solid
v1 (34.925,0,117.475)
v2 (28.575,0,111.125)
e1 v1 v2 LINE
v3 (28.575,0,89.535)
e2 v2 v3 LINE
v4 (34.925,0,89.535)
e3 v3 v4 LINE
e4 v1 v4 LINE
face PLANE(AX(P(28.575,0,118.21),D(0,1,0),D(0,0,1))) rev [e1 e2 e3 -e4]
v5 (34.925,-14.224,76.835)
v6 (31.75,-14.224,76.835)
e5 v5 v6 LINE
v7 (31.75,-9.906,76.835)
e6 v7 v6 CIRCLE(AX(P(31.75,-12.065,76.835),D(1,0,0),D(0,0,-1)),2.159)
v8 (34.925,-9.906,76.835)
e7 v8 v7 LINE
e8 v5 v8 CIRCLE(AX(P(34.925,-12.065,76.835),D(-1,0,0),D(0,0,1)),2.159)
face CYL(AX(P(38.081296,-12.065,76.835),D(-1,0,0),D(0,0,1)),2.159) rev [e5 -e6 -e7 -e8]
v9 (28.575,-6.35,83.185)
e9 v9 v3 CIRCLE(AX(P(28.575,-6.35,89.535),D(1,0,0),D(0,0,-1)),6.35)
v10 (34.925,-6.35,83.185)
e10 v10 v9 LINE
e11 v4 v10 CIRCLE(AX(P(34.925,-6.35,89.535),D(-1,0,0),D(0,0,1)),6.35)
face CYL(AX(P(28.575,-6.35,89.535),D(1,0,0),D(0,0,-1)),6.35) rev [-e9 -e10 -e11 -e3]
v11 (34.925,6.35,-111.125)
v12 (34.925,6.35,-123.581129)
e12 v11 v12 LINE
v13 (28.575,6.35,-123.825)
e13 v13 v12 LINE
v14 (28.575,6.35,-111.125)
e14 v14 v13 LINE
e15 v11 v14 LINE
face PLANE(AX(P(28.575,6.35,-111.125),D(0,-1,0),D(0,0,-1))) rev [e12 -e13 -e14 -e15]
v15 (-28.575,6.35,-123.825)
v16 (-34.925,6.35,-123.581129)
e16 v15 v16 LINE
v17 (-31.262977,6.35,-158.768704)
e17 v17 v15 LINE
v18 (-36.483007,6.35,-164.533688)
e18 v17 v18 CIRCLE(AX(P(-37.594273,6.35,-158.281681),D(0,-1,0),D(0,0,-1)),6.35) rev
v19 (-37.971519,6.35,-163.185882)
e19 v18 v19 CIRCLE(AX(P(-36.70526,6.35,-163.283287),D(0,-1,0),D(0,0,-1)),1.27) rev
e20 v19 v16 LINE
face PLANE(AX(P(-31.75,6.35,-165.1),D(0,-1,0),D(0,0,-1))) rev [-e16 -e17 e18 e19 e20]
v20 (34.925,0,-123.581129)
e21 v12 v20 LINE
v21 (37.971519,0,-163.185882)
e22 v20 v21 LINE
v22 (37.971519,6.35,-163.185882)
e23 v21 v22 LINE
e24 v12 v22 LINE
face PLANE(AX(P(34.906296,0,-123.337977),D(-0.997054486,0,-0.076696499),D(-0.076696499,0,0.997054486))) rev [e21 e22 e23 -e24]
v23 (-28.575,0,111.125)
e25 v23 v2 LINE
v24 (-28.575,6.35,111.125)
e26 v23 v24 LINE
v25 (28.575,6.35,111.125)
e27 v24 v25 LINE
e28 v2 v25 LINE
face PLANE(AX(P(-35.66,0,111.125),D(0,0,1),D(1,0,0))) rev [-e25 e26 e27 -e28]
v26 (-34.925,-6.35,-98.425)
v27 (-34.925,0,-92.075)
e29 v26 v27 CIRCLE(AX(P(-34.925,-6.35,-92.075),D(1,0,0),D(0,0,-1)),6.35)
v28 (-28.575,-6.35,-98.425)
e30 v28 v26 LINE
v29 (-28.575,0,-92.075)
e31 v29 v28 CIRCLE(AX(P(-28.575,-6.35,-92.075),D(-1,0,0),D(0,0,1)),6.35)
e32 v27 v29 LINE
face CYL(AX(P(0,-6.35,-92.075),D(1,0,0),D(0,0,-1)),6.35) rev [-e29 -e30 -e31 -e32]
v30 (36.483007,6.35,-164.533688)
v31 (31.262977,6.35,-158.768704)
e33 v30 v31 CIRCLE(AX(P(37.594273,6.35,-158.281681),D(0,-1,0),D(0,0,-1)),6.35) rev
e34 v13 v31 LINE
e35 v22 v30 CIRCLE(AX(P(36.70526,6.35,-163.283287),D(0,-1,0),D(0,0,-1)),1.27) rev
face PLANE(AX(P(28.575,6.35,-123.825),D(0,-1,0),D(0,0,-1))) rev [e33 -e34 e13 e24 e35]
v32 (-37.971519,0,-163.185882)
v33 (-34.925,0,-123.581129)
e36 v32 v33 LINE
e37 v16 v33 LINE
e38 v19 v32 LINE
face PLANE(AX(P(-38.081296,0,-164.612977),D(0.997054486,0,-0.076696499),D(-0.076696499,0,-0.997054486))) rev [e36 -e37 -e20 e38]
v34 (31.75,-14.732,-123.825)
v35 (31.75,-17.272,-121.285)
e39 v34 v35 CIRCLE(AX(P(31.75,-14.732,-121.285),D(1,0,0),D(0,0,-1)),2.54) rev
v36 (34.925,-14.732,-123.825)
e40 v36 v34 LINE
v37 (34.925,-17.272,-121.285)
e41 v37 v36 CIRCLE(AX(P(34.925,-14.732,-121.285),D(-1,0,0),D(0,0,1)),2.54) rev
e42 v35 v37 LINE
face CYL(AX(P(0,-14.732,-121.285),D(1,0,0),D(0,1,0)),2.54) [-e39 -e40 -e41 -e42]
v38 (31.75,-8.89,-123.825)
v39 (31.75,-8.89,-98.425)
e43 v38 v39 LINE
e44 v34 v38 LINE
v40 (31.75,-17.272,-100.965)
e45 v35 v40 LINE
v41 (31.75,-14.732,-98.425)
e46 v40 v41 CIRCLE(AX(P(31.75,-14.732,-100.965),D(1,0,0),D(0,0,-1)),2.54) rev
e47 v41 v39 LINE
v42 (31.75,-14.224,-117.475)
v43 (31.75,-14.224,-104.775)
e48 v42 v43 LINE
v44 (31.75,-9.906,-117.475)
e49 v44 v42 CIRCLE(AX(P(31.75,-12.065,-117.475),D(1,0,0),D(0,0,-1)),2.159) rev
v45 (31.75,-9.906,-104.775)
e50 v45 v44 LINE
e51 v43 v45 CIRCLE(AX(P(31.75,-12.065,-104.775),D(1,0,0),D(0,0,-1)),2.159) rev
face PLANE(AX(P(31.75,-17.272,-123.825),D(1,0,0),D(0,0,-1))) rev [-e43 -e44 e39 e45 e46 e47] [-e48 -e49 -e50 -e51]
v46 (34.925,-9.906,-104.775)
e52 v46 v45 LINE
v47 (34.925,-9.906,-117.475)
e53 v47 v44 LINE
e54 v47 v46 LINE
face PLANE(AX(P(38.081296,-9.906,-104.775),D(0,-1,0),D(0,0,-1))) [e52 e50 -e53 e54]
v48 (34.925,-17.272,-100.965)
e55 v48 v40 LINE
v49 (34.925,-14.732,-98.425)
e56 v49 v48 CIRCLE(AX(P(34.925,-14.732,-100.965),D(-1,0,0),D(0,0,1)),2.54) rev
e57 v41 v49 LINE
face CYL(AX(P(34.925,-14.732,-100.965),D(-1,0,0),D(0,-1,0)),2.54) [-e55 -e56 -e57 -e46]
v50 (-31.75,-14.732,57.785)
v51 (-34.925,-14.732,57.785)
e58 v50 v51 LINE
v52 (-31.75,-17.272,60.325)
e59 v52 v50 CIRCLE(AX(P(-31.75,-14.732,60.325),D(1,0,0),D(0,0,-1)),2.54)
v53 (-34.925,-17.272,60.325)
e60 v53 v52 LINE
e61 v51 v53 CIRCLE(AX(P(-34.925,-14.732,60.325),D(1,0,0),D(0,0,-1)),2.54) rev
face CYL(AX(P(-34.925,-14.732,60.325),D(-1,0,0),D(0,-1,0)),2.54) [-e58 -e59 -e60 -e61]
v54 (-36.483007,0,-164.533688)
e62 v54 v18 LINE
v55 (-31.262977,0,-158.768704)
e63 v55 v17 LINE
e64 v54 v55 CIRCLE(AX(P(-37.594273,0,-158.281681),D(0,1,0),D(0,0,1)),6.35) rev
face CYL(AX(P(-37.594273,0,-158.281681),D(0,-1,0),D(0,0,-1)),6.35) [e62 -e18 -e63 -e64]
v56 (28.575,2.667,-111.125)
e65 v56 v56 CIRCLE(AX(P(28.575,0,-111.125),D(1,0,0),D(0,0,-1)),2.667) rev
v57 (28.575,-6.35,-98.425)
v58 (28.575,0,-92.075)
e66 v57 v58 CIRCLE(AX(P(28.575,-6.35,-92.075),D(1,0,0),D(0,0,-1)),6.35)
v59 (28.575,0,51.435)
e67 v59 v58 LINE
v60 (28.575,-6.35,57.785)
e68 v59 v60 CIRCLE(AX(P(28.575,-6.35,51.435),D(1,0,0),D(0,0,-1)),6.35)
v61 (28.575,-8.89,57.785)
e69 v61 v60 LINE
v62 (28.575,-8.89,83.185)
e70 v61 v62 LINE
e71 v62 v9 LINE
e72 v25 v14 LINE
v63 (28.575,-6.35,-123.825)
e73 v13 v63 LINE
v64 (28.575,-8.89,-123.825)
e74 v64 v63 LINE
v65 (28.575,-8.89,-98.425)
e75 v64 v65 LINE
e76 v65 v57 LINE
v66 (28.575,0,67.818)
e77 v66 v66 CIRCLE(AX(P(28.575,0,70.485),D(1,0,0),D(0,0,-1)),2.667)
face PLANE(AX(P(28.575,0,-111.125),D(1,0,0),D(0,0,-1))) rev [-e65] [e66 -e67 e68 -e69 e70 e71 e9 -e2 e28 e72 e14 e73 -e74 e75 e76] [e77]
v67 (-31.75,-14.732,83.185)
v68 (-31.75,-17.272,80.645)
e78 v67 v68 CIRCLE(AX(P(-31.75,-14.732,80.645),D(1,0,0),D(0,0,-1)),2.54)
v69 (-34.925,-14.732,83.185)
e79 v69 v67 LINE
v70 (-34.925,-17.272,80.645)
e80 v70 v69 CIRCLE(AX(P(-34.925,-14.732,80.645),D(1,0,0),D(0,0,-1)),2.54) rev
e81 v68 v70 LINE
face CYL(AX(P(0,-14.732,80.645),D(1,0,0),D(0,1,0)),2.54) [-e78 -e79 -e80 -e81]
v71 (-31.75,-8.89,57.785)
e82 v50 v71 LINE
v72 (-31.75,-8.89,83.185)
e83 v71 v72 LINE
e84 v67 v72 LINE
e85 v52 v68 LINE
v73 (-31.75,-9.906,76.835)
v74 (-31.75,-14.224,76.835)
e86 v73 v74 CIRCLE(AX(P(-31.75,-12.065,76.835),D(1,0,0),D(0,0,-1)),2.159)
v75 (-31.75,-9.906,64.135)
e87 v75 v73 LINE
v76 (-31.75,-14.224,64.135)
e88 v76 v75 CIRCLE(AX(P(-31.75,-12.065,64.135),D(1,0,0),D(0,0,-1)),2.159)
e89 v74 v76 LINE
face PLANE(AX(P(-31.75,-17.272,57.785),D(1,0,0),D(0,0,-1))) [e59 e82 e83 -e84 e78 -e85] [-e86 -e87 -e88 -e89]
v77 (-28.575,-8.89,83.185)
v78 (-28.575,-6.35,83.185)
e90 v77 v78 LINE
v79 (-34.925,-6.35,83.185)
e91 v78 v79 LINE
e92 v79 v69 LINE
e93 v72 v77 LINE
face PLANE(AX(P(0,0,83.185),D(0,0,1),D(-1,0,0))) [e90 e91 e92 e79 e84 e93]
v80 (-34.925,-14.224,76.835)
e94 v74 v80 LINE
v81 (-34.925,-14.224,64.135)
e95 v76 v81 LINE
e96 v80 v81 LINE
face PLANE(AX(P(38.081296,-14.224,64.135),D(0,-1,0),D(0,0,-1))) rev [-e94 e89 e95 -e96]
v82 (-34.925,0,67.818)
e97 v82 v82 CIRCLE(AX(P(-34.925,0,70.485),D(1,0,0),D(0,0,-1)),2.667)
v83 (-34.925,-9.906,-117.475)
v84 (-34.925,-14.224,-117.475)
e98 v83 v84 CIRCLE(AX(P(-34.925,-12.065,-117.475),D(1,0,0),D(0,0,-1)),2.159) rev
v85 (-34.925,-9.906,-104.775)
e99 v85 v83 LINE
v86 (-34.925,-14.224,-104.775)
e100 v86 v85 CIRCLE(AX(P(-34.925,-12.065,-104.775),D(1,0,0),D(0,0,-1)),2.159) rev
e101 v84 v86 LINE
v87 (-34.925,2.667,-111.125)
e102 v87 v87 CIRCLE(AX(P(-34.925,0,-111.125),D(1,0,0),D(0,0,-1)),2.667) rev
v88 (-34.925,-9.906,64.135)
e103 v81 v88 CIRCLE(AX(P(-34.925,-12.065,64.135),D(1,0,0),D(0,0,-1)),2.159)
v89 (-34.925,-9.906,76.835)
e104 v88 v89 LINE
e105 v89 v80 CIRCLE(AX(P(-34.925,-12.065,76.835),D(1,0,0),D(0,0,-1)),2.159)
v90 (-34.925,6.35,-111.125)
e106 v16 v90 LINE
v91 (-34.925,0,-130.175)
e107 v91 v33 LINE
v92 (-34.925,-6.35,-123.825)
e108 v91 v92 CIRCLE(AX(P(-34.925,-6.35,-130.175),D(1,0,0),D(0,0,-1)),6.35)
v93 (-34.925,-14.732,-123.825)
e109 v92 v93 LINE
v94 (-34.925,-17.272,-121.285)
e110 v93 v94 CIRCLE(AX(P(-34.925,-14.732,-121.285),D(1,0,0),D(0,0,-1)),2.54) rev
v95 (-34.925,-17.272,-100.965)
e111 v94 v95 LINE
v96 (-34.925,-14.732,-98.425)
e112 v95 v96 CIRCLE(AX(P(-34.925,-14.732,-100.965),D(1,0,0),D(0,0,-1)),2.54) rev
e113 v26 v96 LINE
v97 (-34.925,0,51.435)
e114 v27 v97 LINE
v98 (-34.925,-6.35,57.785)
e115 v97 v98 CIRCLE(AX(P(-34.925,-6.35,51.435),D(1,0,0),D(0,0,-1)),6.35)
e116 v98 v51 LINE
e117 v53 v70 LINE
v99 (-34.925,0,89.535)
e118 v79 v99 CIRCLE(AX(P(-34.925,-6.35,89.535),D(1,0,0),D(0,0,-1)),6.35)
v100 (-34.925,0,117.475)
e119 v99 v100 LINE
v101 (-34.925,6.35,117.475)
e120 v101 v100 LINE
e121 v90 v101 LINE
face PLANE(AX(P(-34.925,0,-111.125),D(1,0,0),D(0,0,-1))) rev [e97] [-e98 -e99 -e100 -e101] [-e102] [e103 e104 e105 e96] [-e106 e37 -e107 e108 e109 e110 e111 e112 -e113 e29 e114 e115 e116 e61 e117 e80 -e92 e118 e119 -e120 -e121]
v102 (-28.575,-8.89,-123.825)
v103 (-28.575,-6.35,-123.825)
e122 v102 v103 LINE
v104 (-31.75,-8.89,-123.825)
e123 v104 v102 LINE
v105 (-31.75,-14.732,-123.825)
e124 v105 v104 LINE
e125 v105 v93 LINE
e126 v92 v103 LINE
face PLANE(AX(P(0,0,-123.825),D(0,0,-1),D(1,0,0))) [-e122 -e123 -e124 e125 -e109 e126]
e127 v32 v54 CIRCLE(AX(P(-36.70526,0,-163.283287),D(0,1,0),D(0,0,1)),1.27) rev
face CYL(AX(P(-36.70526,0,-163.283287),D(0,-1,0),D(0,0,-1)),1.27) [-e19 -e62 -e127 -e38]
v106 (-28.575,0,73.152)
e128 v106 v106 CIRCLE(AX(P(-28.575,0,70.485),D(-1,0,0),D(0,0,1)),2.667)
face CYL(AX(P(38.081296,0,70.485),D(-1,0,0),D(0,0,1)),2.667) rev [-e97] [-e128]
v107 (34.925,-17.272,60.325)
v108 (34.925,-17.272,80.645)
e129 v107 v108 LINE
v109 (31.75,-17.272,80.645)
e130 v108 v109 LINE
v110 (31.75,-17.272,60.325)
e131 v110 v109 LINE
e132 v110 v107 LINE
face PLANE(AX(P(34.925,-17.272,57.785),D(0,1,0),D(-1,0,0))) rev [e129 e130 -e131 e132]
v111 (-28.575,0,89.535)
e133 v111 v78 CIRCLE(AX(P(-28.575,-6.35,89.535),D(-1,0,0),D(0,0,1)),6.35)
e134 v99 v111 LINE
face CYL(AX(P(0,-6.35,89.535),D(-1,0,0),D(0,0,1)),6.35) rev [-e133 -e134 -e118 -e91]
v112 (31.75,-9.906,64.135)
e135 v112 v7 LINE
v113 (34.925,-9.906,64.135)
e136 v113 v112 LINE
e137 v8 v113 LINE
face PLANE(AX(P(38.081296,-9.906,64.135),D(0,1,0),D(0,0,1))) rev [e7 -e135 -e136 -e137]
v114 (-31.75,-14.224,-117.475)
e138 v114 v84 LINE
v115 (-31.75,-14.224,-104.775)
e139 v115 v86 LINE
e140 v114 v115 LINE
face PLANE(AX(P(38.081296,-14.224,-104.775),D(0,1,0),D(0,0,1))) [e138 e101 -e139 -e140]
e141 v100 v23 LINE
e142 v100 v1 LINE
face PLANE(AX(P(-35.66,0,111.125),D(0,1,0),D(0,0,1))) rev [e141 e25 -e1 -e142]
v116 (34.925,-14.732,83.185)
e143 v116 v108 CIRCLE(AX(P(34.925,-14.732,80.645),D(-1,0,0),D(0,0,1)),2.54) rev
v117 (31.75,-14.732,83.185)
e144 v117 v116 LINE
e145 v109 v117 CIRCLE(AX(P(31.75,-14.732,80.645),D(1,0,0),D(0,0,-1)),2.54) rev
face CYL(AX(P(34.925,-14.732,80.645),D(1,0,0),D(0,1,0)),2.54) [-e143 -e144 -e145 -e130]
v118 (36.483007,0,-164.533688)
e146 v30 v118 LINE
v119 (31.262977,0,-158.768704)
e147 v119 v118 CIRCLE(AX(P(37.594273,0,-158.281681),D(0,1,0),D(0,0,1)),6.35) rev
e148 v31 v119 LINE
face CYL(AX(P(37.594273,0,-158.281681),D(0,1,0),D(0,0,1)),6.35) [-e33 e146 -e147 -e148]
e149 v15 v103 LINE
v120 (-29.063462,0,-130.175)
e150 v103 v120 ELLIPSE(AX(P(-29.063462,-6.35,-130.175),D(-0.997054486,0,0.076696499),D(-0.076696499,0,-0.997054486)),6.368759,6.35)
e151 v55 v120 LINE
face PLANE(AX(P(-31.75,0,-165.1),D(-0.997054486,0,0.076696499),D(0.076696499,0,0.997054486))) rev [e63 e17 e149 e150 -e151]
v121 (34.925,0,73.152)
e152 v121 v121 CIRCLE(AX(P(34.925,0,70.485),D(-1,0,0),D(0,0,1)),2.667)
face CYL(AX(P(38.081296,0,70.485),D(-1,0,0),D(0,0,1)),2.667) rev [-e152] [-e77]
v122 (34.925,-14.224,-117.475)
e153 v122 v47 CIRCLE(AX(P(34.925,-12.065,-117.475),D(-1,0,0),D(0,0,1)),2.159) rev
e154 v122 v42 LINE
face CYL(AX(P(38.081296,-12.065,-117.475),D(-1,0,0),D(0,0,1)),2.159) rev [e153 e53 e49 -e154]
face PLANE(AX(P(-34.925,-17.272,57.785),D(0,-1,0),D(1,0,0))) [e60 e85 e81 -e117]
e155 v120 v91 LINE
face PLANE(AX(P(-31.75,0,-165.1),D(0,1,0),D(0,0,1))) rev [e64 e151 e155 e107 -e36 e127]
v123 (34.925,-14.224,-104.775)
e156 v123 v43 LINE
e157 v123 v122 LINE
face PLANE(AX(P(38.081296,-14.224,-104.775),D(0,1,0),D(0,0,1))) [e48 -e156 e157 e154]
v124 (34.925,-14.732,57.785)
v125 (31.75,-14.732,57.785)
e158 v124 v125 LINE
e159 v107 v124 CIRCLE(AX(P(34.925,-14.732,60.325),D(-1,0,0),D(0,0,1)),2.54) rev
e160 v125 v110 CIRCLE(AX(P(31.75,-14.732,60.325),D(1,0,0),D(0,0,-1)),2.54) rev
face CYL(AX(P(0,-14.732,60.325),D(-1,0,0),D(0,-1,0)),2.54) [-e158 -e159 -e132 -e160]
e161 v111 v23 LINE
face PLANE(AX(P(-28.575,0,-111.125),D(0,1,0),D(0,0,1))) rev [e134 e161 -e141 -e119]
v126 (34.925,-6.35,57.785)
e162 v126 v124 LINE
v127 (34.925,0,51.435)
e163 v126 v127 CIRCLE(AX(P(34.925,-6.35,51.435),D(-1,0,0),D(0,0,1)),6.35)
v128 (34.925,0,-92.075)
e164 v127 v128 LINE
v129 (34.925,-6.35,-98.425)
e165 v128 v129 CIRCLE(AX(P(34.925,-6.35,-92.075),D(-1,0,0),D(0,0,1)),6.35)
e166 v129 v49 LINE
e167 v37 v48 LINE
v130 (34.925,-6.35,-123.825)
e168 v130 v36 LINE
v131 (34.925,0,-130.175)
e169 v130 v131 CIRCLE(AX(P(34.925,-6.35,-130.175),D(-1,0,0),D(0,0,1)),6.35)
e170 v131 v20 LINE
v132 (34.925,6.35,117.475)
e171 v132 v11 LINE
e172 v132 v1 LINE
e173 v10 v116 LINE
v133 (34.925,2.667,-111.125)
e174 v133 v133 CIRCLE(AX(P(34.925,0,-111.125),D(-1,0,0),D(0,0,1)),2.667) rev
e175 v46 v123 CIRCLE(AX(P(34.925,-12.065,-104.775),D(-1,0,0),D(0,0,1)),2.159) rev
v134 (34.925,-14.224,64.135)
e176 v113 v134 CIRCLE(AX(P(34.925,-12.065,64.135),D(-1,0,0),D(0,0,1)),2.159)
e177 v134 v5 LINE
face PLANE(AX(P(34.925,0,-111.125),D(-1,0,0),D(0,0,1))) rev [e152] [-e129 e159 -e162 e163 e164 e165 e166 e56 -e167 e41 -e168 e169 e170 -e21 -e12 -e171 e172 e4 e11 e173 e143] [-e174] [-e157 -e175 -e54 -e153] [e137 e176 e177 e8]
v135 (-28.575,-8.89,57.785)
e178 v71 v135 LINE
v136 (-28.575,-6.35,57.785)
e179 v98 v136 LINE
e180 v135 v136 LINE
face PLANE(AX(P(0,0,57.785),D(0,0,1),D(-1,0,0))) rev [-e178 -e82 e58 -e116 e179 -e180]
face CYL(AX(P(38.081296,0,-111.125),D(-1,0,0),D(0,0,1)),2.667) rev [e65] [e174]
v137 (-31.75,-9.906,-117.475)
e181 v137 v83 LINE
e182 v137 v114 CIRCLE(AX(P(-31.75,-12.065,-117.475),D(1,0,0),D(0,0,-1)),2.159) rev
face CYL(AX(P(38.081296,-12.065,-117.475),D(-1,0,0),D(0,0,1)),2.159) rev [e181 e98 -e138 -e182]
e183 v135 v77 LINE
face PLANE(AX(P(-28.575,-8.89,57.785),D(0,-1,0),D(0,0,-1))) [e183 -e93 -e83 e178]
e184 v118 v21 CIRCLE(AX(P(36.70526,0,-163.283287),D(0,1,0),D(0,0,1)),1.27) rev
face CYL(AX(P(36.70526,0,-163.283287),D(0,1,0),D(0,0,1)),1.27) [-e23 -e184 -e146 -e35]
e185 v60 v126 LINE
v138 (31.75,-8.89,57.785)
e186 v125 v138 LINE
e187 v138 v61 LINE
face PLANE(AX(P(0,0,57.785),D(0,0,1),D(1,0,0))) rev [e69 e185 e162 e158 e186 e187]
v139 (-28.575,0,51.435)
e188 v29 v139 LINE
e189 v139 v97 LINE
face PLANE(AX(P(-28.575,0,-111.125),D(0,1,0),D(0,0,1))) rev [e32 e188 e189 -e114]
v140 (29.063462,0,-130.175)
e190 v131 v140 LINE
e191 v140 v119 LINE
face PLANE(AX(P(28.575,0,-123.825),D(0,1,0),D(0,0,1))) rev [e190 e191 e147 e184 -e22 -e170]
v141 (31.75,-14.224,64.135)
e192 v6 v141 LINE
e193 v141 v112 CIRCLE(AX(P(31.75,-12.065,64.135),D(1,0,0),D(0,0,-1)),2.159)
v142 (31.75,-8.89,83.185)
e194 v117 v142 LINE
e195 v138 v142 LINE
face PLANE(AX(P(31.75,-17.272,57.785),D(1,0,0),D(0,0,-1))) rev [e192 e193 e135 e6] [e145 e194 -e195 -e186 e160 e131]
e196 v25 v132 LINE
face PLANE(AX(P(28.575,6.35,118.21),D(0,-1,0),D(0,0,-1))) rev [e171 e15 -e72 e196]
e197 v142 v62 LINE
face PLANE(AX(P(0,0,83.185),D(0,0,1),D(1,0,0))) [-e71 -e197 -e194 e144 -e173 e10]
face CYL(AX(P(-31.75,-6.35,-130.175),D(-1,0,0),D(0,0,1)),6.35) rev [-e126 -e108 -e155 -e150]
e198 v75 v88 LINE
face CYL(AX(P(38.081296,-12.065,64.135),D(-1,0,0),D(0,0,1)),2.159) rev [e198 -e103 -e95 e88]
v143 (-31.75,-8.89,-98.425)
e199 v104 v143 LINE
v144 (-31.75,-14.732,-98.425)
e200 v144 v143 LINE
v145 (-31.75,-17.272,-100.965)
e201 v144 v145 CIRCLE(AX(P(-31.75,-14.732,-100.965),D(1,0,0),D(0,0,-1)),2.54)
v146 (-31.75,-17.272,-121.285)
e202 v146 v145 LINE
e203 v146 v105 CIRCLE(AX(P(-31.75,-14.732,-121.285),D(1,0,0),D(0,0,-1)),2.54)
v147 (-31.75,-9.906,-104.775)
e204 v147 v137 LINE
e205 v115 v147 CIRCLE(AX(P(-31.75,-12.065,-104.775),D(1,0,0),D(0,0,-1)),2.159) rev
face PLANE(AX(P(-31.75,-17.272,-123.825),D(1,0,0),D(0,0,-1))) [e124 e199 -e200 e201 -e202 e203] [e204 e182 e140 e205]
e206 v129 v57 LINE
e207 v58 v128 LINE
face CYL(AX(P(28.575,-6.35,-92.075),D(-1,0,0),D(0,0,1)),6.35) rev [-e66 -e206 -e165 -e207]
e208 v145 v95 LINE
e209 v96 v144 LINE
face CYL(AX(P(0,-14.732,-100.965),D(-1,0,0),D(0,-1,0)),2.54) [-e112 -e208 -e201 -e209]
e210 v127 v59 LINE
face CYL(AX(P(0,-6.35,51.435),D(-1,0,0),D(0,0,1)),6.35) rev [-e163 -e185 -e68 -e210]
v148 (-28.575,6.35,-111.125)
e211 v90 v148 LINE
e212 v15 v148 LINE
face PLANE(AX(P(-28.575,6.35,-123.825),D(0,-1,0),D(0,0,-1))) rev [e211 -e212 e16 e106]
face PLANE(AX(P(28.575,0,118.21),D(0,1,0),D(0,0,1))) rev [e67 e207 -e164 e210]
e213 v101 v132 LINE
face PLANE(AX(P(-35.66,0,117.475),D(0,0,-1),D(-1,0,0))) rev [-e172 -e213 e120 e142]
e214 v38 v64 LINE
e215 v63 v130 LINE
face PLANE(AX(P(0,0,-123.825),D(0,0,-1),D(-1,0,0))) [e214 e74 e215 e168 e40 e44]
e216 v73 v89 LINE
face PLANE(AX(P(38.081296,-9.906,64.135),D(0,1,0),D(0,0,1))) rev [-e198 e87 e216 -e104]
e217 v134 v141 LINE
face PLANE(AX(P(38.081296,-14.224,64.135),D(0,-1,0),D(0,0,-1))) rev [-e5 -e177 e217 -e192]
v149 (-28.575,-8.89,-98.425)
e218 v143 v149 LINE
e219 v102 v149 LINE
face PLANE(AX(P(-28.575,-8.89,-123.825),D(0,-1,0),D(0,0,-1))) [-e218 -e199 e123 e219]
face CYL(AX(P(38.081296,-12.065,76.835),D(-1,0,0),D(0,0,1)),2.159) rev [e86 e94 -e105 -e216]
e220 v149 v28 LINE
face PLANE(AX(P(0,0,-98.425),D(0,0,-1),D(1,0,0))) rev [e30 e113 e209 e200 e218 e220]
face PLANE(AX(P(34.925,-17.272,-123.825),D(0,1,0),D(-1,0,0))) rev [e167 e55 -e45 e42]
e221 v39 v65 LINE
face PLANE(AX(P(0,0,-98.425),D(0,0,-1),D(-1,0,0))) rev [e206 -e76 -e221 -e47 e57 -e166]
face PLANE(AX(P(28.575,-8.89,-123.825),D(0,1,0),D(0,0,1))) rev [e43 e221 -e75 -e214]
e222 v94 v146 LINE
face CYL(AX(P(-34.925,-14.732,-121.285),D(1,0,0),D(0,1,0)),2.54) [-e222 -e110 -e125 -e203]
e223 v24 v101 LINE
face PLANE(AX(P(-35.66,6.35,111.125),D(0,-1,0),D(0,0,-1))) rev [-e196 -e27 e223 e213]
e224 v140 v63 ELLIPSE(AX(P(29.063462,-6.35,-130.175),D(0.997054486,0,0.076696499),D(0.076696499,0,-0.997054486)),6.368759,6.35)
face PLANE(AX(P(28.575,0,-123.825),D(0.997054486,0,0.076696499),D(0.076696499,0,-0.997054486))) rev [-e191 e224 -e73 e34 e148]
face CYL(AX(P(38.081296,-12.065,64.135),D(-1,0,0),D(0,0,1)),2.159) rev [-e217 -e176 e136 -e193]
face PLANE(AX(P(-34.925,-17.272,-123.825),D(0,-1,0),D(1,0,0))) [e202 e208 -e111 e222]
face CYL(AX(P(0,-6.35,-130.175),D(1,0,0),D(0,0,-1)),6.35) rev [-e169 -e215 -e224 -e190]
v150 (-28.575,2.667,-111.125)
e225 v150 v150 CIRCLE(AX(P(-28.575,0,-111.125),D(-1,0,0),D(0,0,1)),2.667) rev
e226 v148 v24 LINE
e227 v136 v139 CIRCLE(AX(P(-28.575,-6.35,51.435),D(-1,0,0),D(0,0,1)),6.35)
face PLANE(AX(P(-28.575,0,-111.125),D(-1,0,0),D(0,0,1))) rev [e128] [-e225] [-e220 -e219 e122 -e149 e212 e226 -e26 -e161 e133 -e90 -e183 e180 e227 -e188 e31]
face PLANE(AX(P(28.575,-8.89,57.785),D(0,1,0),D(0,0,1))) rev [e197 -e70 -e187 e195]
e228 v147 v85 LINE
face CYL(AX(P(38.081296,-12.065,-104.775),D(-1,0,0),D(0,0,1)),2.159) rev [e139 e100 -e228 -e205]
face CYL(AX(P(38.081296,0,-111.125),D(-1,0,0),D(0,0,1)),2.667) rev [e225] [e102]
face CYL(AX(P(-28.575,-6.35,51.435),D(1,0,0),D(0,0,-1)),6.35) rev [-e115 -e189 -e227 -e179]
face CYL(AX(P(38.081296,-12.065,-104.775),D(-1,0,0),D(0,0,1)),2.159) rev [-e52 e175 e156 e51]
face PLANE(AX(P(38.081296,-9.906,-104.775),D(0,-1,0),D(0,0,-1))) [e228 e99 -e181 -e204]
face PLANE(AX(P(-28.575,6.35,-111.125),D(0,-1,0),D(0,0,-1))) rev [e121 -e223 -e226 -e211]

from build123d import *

# Parameters (mm, degrees)
RAIL_PROFILE_W     = 6.35
RAIL_PROFILE_H     = 6.35
BACKCLIP_DEPTH     = 12.7
FRONTCLIP_DEPTH    = 12.7
SKETCH8_R          = 2.667
CUT_EXTRUDE1_DEPTH = 179.88374375
FILLET1_R          = 2.54
CUT_EXTRUDE3_DEPTH = 181.090926708
FILLET3_R          = 6.35
FILLET5_R          = 1.27
FILLET10_R         = 6.35


with BuildPart() as part:
    # Sweep1: sweep along a path in rail_path
    with BuildLine(Plane(origin=(0, 0, 0), x_dir=(1, 0, 0), z_dir=(0, 1, 0))) as sweep1_path:
        Line((31.75, 165.1), (28.575, 123.825))
        Line((28.575, 123.825), (28.575, 111.125))
        Line((28.575, 111.125), (28.575, -111.125))
        Line((28.575, -111.125), (-28.575, -111.125))
        Line((-28.575, -111.125), (-28.575, 111.125))
        Line((-28.575, 111.125), (-28.575, 123.825))
        Line((-28.575, 123.825), (-31.75, 165.1))
    # rail_profile → Sweep1 (sweep)
    with BuildSketch(Plane.XY):
        with Locations((31.75, 3.175)):
            Rectangle(RAIL_PROFILE_W, RAIL_PROFILE_H)
    sweep(path=sweep1_path.line, transition=Transition.RIGHT)

    # BackClipProfile → BackClip (add, symmetric)
    with BuildSketch(Plane(origin=(0, 0, 70.485), x_dir=(-1, 0, 0), z_dir=(0, 0, -1))):
        Polygon((-34.925, -8.89), (-34.925, 0), (-28.575, 0), (-28.575, -8.89), (-31.75, -8.89), (-31.75, -17.272), (-34.925, -17.272), align=None)
    backclip = extrude(amount=BACKCLIP_DEPTH, both=True)

    # BackClipMirror: BackClip across plane
    add(backclip.mirror(Plane(origin=(0, 0, 0), x_dir=(0, 0, 1), z_dir=(1, 0, 0))))

    # FrontClipProfile → FrontClip (add, symmetric)
    with BuildSketch(Plane(origin=(0, 0, -111.125), x_dir=(-1, 0, 0), z_dir=(0, 0, -1))):
        Polygon((-31.75, -17.272), (-31.75, -8.89), (-28.575, -8.89), (-28.575, 0), (-34.925, 0), (-34.925, -8.89), (-34.925, -17.272), align=None)
    frontclip = extrude(amount=FRONTCLIP_DEPTH, both=True)

    # FrontClipMirror: FrontClip across plane
    add(frontclip.mirror(Plane(origin=(0, 0, 0), x_dir=(0, 0, 1), z_dir=(1, 0, 0))))

    # Sketch8 → Cut-Extrude1 (cut, symmetric)
    with BuildSketch(Plane.ZY.offset(-28.575)):
        with Locations((70.485, 0)):
            Circle(SKETCH8_R)
    cut_extrude1 = extrude(amount=CUT_EXTRUDE1_DEPTH, both=True, mode=Mode.SUBTRACT)

    # Fillet1
    fillet1_edges = [part.edges().sort_by_distance(p)[0] for p in [
        (33.3375, -17.272, -98.425),
        (33.3375, -17.272, -123.825),
        (-33.3375, -17.272, -123.825),
        (-33.3375, -17.272, -98.425),
        (33.3375, -17.272, 83.185),
        (33.3375, -17.272, 57.785),
        (-33.3375, -17.272, 57.785),
        (-33.3375, -17.272, 83.185),
    ]]
    fillet(fillet1_edges, radius=FILLET1_R)

    # Mirror2: Cut-Extrude1 across plane
    add(cut_extrude1.mirror(Plane(origin=(0, 0, -20.32), x_dir=(1, 0, 0), z_dir=(0, 0, -1))), mode=Mode.SUBTRACT)

    # Sketch10 → Cut-Extrude3 (cut, symmetric)
    with BuildSketch(Plane.ZY.offset(-31.75)):
        with BuildLine():
            Line((64.135, -9.906), (76.835, -9.906))
            ThreePointArc((76.835, -9.906), (78.994, -12.065), (76.835, -14.224))
            Line((76.835, -14.224), (64.135, -14.224))
            ThreePointArc((64.135, -14.224), (61.976, -12.065), (64.135, -9.906))
        make_face()
    cut_extrude3 = extrude(amount=CUT_EXTRUDE3_DEPTH, both=True, mode=Mode.SUBTRACT)

    # Mirror3: Cut-Extrude3 across plane
    add(cut_extrude3.mirror(Plane(origin=(0, 0, -20.32), x_dir=(1, 0, 0), z_dir=(0, 0, -1))), mode=Mode.SUBTRACT)

    # Fillet3
    fillet3_edges = [part.edges().sort_by_distance(p)[0] for p in [
        (31.75, 3.175, -165.1),
        (-31.75, 3.175, -165.1),
    ]]
    fillet(fillet3_edges, radius=FILLET3_R - 0.0001)  # a hair under: the kernel refuses the full size

    # Fillet5
    fillet5_edges = [part.edges().sort_by_distance(p)[0] for p in [
        (-38.081295983, 3.175, -164.612977232),
        (38.081295983, 3.175, -164.612977232),
    ]]
    fillet(fillet5_edges, radius=FILLET5_R)

    # Fillet10
    fillet10_edges = [part.edges().sort_by_distance(p)[0] for p in [
        (31.75, 0, -98.425),
        (31.75, 0, -123.825),
        (-31.75, 0, -123.825),
        (-31.75, 0, -98.425),
        (31.75, 0, 83.185),
        (31.75, 0, 57.785),
        (-31.75, 0, 57.785),
        (-31.75, 0, 83.185),
    ]]
    fillet(fillet10_edges, radius=FILLET10_R)


solid = part.part
